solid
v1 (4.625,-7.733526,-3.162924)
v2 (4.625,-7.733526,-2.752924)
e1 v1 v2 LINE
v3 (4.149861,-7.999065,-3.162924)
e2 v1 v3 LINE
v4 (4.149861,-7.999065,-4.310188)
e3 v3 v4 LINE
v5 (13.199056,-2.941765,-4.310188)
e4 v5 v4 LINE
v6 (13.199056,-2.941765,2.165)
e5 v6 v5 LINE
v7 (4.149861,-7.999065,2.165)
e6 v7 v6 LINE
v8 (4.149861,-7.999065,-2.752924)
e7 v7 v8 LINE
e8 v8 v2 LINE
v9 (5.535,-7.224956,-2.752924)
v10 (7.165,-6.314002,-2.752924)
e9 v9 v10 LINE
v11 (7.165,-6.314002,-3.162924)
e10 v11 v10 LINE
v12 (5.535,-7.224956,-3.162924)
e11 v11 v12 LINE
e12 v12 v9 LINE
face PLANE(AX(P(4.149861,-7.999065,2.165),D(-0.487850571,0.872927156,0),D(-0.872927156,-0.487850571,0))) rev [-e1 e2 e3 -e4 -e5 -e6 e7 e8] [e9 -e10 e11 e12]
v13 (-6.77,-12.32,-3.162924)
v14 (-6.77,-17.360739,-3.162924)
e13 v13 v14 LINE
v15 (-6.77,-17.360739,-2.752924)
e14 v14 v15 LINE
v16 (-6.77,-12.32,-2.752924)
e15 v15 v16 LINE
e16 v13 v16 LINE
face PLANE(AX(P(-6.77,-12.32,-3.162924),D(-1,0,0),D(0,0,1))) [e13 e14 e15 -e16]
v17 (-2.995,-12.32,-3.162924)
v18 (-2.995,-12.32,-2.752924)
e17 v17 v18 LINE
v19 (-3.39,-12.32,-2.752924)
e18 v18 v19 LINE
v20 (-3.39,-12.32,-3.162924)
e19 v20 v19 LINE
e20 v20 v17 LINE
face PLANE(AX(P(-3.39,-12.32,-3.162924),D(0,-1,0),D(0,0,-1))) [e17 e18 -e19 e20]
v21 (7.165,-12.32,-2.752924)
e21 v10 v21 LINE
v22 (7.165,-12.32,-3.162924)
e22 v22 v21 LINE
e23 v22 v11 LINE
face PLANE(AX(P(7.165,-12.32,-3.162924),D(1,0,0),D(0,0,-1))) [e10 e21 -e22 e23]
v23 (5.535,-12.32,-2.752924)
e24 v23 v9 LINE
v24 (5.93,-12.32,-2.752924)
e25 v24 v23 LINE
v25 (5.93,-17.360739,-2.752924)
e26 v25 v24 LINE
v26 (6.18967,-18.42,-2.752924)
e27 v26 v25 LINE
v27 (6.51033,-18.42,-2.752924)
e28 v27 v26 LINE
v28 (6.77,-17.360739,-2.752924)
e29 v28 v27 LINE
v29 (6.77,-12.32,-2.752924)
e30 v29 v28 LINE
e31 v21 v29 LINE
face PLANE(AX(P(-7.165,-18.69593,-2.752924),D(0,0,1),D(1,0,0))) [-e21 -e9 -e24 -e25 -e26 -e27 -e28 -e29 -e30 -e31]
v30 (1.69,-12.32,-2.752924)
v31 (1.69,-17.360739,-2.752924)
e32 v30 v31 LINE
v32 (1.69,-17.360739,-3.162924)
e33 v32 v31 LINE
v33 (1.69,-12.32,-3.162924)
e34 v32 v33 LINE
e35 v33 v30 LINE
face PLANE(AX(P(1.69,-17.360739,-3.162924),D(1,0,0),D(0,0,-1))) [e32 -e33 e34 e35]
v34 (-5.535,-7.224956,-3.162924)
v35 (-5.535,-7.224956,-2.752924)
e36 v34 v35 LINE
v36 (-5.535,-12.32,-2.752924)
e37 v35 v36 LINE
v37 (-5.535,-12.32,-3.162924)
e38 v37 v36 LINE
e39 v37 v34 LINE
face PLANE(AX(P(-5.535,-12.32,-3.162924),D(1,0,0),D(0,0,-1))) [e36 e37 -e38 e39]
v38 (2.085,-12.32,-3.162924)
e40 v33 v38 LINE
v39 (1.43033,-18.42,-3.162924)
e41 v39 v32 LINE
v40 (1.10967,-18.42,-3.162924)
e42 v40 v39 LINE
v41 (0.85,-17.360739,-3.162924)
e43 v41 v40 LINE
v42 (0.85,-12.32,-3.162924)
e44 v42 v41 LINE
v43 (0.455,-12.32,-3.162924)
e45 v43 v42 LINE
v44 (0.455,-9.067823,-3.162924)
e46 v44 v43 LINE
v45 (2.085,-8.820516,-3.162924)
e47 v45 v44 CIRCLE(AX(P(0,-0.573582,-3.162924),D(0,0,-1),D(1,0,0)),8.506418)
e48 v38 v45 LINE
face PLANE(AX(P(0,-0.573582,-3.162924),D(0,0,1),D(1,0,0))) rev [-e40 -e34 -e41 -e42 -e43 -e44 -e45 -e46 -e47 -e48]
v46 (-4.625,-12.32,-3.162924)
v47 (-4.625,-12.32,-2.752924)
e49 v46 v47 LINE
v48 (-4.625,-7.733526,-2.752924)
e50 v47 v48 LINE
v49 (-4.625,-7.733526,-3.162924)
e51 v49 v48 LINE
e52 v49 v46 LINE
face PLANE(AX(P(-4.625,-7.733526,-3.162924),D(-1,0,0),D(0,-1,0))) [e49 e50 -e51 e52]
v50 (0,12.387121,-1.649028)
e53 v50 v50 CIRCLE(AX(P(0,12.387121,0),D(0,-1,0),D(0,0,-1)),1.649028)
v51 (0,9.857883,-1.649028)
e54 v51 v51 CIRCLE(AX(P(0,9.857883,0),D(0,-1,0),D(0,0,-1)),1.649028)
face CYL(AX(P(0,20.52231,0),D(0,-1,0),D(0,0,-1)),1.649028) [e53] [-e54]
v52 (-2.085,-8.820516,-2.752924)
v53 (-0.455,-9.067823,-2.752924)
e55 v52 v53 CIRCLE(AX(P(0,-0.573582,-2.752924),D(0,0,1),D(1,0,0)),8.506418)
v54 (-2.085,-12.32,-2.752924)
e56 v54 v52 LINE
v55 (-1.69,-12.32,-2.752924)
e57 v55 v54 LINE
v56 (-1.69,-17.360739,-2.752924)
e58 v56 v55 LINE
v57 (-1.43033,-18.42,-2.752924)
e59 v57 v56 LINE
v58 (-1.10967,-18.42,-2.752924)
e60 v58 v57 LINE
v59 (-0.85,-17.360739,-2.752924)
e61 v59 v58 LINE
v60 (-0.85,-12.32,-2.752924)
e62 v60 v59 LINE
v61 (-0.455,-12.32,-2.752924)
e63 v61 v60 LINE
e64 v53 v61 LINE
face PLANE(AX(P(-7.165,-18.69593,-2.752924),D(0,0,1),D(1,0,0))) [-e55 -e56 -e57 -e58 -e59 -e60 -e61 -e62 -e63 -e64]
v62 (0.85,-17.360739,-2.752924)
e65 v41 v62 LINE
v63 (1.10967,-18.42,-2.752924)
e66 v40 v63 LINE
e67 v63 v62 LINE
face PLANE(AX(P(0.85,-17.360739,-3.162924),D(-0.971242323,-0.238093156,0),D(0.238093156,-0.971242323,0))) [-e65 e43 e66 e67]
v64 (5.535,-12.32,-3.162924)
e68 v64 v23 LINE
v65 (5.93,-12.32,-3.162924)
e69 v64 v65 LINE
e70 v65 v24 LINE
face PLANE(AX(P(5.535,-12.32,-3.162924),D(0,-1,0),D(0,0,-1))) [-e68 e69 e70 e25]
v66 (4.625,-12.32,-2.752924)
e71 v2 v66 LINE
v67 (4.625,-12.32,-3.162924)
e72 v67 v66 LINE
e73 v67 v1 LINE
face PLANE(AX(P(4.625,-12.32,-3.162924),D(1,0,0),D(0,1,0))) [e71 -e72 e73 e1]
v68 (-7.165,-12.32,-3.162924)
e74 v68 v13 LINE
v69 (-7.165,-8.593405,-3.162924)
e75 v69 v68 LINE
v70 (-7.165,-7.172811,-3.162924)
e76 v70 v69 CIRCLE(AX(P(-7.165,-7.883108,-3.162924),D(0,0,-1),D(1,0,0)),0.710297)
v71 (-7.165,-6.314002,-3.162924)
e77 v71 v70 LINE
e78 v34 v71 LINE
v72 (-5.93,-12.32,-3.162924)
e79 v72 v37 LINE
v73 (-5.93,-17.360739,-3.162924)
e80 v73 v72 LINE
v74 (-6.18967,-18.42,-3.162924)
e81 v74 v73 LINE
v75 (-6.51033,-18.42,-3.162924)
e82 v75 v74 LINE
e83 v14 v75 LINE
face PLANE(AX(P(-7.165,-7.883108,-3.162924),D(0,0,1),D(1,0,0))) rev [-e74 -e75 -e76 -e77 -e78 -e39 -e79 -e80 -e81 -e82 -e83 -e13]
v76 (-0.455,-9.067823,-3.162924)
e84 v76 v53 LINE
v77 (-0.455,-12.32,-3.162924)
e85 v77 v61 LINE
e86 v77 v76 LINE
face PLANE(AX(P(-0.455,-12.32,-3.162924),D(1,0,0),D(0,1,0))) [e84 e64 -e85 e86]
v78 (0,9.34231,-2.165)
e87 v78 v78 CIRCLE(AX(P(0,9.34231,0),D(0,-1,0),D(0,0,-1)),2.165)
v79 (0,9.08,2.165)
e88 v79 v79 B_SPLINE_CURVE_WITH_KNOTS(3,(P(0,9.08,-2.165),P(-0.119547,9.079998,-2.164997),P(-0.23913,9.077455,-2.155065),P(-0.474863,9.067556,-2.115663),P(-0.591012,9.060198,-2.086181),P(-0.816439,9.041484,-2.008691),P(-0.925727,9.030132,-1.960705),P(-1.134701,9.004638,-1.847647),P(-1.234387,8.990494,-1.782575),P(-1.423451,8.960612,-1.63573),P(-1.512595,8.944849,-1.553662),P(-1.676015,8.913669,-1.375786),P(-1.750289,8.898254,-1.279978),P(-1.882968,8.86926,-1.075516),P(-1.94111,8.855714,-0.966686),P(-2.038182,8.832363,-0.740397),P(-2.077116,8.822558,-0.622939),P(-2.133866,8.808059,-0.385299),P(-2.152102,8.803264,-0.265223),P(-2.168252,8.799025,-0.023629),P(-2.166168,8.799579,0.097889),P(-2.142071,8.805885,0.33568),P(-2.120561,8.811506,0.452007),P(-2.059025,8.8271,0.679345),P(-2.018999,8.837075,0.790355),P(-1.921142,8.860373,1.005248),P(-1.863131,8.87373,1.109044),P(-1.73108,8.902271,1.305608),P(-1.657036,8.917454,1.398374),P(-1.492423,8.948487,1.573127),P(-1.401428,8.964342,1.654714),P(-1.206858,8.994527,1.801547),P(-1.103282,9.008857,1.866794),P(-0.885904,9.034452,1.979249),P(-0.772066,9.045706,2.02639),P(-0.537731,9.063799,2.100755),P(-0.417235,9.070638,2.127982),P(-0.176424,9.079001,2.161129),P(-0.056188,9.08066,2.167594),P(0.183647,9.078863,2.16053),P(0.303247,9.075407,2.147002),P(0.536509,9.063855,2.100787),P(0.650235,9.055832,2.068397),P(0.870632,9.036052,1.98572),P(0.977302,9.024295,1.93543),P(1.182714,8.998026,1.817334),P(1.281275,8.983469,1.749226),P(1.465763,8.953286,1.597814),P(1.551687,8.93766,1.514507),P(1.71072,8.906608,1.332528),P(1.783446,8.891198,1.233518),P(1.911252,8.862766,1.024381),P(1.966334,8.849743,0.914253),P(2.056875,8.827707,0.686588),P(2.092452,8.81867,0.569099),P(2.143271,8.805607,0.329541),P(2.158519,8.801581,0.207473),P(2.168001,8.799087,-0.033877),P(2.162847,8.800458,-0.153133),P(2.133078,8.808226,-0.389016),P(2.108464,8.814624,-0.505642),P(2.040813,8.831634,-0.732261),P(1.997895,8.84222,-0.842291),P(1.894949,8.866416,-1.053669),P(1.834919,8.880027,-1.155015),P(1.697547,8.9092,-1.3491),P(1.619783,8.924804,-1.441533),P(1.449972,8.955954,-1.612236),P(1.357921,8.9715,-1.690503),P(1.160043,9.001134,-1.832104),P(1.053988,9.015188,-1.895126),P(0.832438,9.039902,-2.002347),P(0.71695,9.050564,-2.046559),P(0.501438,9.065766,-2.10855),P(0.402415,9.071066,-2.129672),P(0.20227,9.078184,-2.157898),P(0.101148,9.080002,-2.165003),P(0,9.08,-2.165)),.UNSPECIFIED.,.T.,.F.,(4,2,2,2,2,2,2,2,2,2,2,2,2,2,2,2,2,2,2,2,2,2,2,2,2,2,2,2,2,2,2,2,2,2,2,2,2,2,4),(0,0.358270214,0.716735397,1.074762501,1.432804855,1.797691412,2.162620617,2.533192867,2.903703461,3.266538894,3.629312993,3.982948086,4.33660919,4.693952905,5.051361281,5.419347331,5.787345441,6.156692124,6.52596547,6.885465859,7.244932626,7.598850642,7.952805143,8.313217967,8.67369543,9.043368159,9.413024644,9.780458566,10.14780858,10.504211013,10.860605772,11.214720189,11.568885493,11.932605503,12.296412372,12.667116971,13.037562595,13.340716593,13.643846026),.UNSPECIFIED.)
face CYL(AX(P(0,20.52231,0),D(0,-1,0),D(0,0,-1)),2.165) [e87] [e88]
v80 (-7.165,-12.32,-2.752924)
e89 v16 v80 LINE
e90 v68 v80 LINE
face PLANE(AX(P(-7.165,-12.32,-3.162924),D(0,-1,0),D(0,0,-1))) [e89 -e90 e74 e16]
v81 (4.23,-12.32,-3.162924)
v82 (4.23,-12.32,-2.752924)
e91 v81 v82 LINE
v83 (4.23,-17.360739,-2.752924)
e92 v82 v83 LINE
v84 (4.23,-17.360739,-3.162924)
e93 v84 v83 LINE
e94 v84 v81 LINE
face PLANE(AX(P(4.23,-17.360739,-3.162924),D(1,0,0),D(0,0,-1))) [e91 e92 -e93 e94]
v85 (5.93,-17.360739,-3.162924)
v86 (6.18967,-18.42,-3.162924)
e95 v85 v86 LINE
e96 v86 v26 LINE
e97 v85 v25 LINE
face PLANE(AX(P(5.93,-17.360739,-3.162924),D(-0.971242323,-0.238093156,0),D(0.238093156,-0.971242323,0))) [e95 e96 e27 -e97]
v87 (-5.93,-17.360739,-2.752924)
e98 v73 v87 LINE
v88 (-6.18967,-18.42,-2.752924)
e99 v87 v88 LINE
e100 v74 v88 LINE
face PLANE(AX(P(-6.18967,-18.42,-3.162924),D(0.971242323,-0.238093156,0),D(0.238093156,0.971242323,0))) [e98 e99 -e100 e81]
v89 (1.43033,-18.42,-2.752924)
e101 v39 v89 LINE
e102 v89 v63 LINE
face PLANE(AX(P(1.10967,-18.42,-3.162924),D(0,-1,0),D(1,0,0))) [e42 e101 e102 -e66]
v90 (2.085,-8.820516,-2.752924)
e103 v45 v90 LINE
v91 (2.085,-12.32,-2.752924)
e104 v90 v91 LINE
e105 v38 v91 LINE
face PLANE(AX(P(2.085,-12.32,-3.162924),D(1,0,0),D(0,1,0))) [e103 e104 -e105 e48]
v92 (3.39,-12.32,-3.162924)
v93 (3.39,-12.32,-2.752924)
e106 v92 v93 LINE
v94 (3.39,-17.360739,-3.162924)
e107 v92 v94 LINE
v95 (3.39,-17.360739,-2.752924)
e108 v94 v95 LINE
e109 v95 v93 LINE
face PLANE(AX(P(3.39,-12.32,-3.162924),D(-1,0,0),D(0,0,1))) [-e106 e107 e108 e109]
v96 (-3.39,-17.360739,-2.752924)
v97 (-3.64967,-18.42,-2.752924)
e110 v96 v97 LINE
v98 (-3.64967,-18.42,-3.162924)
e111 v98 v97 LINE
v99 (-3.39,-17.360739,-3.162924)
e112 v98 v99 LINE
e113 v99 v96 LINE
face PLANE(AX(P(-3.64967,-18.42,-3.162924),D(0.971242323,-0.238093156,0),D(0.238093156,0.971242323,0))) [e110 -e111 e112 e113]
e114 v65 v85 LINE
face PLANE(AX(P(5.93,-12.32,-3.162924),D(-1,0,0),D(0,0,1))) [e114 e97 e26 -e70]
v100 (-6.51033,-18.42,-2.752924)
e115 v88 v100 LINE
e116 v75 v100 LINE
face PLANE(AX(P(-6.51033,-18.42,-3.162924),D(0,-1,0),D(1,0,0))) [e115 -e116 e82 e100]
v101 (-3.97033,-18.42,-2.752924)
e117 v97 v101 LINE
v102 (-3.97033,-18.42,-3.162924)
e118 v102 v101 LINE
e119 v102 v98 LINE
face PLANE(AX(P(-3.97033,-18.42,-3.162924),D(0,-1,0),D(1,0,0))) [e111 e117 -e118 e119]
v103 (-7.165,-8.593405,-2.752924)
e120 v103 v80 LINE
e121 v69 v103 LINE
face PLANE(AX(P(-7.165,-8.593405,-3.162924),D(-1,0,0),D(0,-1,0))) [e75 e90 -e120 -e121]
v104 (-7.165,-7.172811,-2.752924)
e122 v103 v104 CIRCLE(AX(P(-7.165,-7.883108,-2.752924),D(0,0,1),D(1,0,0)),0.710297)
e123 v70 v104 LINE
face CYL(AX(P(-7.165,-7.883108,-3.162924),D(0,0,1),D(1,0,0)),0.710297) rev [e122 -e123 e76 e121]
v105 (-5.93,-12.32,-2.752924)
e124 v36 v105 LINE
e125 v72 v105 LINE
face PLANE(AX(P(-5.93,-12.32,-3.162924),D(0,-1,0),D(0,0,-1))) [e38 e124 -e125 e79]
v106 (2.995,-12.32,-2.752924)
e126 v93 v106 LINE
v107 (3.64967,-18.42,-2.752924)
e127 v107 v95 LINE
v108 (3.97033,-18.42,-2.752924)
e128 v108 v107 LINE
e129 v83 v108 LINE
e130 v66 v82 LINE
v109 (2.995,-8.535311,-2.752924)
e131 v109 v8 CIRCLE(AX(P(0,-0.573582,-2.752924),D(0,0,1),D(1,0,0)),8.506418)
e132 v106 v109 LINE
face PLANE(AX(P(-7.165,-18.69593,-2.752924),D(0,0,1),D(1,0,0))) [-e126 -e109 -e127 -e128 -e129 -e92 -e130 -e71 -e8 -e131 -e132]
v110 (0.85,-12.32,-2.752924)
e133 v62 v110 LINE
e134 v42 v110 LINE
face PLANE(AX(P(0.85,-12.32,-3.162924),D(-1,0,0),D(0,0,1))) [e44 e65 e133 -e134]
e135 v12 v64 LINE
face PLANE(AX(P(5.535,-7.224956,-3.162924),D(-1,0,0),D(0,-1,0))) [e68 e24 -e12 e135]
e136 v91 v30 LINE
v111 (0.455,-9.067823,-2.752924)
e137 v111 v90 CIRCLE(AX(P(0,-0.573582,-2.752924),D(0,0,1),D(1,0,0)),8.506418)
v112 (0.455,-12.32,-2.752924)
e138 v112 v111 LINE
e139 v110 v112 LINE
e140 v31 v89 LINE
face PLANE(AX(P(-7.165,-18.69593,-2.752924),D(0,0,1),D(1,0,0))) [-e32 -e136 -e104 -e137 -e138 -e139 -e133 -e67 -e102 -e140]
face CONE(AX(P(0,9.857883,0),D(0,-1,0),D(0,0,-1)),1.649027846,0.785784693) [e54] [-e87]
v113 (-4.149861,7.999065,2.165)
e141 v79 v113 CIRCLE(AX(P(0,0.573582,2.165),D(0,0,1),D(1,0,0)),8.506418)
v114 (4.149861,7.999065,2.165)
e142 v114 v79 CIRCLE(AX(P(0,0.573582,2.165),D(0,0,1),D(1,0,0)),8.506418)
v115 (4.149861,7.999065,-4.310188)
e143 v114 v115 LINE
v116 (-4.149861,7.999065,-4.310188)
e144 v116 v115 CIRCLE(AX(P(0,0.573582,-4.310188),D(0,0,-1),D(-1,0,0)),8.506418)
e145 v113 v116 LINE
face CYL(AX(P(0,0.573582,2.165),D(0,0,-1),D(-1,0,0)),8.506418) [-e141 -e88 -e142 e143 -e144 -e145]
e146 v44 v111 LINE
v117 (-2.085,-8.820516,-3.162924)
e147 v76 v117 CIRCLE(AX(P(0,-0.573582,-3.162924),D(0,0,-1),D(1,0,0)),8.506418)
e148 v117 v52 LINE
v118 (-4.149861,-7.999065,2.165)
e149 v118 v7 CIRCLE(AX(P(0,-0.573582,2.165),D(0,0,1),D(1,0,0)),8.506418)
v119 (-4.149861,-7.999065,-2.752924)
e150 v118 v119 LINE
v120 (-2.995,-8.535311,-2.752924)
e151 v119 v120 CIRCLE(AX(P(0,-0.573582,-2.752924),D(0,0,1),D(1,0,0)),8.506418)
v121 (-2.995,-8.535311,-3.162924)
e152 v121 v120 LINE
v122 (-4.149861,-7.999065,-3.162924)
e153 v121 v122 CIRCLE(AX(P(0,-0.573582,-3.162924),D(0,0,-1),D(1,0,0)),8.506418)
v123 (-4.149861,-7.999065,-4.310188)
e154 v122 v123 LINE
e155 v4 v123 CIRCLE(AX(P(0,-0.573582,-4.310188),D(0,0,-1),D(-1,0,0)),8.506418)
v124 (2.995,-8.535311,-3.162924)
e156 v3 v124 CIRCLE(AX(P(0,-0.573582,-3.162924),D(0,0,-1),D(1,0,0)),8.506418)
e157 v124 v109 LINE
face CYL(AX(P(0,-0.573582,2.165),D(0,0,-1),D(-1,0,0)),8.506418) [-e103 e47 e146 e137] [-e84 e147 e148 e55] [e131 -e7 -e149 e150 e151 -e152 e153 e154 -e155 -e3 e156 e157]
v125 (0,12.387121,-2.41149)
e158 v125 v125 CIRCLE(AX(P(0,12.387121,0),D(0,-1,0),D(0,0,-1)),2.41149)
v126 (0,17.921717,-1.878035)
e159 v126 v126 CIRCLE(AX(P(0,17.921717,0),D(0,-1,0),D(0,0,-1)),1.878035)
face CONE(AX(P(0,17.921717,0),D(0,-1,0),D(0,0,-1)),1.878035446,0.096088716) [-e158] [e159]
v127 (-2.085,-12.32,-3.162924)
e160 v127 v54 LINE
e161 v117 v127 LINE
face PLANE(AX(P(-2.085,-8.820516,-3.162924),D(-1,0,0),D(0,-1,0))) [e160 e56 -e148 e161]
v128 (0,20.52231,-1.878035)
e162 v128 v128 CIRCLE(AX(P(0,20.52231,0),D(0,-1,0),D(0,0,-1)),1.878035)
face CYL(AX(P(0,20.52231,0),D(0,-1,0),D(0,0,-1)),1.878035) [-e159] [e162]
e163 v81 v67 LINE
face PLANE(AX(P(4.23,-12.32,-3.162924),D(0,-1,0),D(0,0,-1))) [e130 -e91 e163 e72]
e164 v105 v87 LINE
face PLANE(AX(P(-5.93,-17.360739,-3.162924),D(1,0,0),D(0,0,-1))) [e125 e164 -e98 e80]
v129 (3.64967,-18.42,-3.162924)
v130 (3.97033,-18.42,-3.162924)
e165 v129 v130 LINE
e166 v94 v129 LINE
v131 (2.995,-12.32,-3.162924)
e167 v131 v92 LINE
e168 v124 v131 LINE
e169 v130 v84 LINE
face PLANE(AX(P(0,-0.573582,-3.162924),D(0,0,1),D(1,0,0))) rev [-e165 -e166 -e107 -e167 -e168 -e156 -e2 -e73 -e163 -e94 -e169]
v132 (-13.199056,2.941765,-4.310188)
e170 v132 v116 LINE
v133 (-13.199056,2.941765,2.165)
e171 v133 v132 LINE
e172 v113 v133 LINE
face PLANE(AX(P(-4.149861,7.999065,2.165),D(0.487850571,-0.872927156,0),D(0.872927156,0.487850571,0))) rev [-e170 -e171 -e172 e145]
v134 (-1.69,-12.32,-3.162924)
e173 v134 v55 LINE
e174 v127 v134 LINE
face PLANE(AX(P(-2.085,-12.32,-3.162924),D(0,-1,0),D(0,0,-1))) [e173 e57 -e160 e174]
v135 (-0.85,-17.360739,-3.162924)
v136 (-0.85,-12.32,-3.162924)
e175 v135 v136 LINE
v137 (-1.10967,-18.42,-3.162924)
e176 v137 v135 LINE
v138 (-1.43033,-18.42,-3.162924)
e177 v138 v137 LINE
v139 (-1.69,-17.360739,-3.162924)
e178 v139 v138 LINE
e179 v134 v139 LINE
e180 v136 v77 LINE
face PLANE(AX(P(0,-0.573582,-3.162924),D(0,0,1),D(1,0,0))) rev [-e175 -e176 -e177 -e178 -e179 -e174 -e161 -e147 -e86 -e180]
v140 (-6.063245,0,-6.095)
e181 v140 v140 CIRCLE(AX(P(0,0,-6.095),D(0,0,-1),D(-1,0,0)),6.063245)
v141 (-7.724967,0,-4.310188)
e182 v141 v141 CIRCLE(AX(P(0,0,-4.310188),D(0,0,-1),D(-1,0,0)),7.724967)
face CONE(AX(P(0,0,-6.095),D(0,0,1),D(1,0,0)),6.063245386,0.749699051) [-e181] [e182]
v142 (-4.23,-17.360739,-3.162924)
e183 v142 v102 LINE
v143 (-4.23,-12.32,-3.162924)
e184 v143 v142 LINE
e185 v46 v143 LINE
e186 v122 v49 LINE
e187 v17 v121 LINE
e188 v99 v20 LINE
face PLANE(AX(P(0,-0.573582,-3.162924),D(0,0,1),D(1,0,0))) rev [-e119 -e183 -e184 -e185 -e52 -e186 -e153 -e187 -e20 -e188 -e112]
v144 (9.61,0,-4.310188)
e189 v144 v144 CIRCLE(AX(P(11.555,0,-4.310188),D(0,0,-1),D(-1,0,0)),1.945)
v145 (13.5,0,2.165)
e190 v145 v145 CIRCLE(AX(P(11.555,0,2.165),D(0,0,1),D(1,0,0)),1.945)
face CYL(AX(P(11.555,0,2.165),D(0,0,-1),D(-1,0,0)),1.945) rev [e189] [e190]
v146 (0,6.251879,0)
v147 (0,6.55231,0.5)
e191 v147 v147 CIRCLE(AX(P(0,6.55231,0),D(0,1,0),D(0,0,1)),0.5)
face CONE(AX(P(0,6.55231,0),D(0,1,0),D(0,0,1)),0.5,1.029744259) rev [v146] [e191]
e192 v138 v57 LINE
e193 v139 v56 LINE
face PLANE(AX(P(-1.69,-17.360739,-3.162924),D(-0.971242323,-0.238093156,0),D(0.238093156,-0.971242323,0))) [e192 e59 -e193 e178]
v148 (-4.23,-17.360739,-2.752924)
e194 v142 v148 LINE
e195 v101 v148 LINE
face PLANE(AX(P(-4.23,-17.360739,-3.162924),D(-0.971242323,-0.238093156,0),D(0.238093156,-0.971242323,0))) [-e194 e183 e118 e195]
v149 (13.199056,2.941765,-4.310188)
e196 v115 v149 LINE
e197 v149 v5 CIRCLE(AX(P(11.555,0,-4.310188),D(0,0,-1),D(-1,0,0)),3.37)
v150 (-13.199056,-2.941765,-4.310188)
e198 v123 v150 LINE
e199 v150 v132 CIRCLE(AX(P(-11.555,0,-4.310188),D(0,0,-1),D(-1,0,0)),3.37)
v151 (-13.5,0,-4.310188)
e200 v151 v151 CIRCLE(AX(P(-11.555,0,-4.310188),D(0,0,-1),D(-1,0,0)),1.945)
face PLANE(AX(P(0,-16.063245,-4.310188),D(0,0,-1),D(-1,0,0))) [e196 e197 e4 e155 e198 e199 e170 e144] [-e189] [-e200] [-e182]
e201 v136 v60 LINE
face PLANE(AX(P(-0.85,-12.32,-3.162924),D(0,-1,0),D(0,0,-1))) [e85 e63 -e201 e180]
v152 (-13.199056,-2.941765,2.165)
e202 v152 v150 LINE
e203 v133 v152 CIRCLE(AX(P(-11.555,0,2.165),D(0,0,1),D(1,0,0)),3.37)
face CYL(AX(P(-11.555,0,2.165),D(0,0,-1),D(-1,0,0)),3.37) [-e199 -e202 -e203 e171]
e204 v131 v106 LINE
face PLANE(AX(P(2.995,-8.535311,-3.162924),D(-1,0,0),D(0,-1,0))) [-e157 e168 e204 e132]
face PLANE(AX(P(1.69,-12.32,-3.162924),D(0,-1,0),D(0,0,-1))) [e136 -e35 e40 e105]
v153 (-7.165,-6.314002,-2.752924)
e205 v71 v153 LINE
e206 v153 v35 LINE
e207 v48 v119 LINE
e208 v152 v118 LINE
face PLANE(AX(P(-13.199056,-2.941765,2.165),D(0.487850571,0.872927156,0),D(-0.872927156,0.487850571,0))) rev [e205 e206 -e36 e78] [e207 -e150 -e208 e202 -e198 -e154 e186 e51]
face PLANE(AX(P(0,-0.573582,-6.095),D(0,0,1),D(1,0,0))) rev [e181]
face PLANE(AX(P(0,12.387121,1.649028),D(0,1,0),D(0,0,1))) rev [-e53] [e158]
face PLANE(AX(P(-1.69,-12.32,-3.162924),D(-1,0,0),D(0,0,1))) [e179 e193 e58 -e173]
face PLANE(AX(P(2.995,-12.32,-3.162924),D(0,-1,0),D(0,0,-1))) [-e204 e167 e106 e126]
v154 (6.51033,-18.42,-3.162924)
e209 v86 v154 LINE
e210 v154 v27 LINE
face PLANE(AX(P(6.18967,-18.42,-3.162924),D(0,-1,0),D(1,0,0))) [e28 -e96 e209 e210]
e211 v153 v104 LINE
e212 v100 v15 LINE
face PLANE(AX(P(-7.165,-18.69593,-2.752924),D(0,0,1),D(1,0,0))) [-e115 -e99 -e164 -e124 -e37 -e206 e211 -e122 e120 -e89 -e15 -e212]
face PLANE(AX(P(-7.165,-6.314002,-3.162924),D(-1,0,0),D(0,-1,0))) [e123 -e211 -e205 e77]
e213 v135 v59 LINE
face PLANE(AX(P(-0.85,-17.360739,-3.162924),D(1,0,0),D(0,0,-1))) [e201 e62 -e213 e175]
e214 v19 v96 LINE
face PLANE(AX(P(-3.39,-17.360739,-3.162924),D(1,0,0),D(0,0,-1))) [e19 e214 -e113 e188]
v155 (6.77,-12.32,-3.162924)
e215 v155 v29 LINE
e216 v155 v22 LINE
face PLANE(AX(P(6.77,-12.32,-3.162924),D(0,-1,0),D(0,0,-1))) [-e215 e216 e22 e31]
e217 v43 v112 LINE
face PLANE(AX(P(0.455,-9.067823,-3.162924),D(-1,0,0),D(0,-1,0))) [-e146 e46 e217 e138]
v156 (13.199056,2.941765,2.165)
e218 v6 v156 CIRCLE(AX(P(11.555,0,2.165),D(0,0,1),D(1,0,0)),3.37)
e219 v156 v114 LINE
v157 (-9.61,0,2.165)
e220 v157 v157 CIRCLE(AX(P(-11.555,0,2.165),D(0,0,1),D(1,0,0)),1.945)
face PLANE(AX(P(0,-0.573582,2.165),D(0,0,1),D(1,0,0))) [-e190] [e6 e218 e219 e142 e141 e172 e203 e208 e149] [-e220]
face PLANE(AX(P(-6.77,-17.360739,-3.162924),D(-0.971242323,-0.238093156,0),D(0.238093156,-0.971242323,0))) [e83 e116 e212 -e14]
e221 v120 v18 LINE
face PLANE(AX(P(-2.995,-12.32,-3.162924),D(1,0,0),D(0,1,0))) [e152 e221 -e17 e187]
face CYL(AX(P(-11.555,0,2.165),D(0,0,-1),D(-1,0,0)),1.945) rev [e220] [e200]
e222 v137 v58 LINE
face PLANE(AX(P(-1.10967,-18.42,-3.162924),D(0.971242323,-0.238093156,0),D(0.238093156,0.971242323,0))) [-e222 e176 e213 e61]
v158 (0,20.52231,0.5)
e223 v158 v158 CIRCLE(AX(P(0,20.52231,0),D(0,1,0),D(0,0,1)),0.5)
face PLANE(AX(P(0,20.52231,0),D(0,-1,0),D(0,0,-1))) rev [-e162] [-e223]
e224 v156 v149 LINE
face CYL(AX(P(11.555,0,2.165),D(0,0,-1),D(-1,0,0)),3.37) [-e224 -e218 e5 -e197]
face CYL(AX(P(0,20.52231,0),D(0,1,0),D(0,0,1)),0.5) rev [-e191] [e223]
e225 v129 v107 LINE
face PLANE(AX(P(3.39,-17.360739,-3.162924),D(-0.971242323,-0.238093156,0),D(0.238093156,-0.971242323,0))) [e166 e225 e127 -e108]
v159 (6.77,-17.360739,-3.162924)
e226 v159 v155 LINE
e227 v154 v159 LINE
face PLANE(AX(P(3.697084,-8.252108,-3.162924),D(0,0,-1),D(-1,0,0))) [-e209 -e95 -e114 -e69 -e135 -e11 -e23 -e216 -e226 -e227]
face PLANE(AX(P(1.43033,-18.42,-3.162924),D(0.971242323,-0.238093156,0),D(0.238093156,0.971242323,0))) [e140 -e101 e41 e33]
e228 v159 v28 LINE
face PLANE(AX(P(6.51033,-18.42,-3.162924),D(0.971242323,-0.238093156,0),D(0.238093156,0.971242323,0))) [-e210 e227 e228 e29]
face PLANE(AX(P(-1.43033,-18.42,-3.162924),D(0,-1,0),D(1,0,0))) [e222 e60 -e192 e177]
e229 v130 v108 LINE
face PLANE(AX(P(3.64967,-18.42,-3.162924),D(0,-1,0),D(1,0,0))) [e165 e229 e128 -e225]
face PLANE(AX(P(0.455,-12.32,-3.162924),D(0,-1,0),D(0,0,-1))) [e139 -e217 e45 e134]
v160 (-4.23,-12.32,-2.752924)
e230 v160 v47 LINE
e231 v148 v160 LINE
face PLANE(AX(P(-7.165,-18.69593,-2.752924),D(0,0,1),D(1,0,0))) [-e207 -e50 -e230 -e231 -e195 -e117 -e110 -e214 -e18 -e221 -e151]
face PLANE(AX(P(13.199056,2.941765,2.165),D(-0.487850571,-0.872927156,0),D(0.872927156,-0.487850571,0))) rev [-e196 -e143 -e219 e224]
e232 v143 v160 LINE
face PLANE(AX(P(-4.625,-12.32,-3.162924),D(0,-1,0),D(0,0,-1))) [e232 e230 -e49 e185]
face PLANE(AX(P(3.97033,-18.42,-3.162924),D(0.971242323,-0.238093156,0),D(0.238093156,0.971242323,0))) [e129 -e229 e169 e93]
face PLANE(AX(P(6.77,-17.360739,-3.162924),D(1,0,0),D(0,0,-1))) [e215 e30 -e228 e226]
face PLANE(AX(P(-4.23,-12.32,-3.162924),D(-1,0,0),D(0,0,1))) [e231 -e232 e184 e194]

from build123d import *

# Parameters (mm, degrees)
EXTRUDE6_DEPTH               = 3.162924
EXTRUDE6_2_DEPTH             = 3.162924
EXTRUDE6_3_DEPTH             = 3.162924
EXTRUDE6_4_DEPTH             = 3.162924
EXTRUDE6_5_DEPTH             = 3.162924
EXTRUDE6_6_DEPTH             = 3.162924
EXTRUDE7_START               = -2.752923646
EXTRUDE7_DEPTH               = 2.752923646
EXTRUDE1_DEPTH               = 2.165
EXTRUDE1_DEPTH_BACK          = 6.095
SKETCH3_R                    = 1.945
F_1_0_1_DIAMETER_HOLE1_D     = 1
F_1_0_1_DIAMETER_HOLE1_DEPTH = 13.97
F_1_0_1_DIAMETER_HOLE1_TIP   = 0.30043031


# Read off the part's stored shape, not the designer's step: Extrude7
with BuildPart() as part:
    # Sketch7 → Extrude6 (new body)
    with BuildSketch(Plane.XY):
        with BuildLine():
            Line((-5.535, -12.32), (-5.535, -7.224956165))
            Line((-5.535, -7.224956165), (-7.165, -6.314002227))
            Line((-7.165, -6.314002227), (-7.165, -7.17281133))
            ThreePointArc((-7.165, -7.17281133), (-6.454703172, -7.883108158), (-7.165, -8.593404986))
            Line((-7.165, -8.593404986), (-7.165, -12.32))
            Line((-7.165, -12.32), (-6.77, -12.32))
            Line((-6.77, -12.32), (-6.77, -17.360738904))
            Line((-6.77, -17.360738904), (-6.510329667, -18.42))
            Line((-6.510329667, -18.42), (-6.189670333, -18.42))
            Line((-6.189670333, -18.42), (-5.93, -17.360738904))
            Line((-5.93, -17.360738904), (-5.93, -12.32))
            Line((-5.93, -12.32), (-5.535, -12.32))
        make_face()
    extrude(amount=-EXTRUDE6_DEPTH)


with BuildPart() as body_2:
    # Sketch7 → Extrude6 2 (new body)
    with BuildSketch(Plane.XY):
        with BuildLine():
            Line((-4.625, -7.733525542), (-4.625, -12.32))
            Line((-4.625, -12.32), (-4.23, -12.32))
            Line((-4.23, -12.32), (-4.23, -17.360738904))
            Line((-4.23, -17.360738904), (-3.970329667, -18.42))
            Line((-3.970329667, -18.42), (-3.649670333, -18.42))
            Line((-3.649670333, -18.42), (-3.39, -17.360738904))
            Line((-3.39, -17.360738904), (-3.39, -12.32))
            Line((-3.39, -12.32), (-2.995, -12.32))
            Line((-2.995, -12.32), (-2.995, -8.535310619))
            ThreePointArc((-2.995, -8.535310619), (-3.582478148, -8.288826526), (-4.149861063, -7.999065227))
            Line((-4.149861063, -7.999065227), (-4.625, -7.733525542))
        make_face()
    extrude(amount=-EXTRUDE6_2_DEPTH)


with BuildPart() as body_3:
    # Sketch7 → Extrude6 3 (new body)
    with BuildSketch(Plane.XY):
        with BuildLine():
            Line((-0.455, -12.32), (-0.455, -9.067822531))
            ThreePointArc((-0.455, -9.067822531), (-1.276005531, -8.983751864), (-2.085, -8.82051612))
            Line((-2.085, -8.82051612), (-2.085, -12.32))
            Line((-2.085, -12.32), (-1.69, -12.32))
            Line((-1.69, -12.32), (-1.69, -17.360738904))
            Line((-1.69, -17.360738904), (-1.430329667, -18.42))
            Line((-1.430329667, -18.42), (-1.109670333, -18.42))
            Line((-1.109670333, -18.42), (-0.85, -17.360738904))
            Line((-0.85, -17.360738904), (-0.85, -12.32))
            Line((-0.85, -12.32), (-0.455, -12.32))
        make_face()
    extrude(amount=-EXTRUDE6_3_DEPTH)


with BuildPart() as body_4:
    # Sketch7 → Extrude6 4 (new body)
    with BuildSketch(Plane.XY):
        with BuildLine():
            Line((4.625, -12.32), (4.625, -7.733525542))
            Line((4.625, -7.733525542), (4.149861063, -7.999065227))
            ThreePointArc((4.149861063, -7.999065227), (3.582478148, -8.288826526), (2.995, -8.535310619))
            Line((2.995, -8.535310619), (2.995, -12.32))
            Line((2.995, -12.32), (3.39, -12.32))
            Line((3.39, -12.32), (3.39, -17.360738904))
            Line((3.39, -17.360738904), (3.649670333, -18.42))
            Line((3.649670333, -18.42), (3.970329667, -18.42))
            Line((3.970329667, -18.42), (4.23, -17.360738904))
            Line((4.23, -17.360738904), (4.23, -12.32))
            Line((4.23, -12.32), (4.625, -12.32))
        make_face()
    extrude(amount=-EXTRUDE6_4_DEPTH)


with BuildPart() as body_5:
    # Sketch7 → Extrude6 5 (new body)
    with BuildSketch(Plane.XY):
        with BuildLine():
            Line((0.455, -9.067822531), (0.455, -12.32))
            Line((0.455, -12.32), (0.85, -12.32))
            Line((0.85, -12.32), (0.85, -17.360738904))
            Line((0.85, -17.360738904), (1.109670333, -18.42))
            Line((1.109670333, -18.42), (1.430329667, -18.42))
            Line((1.430329667, -18.42), (1.69, -17.360738904))
            Line((1.69, -17.360738904), (1.69, -12.32))
            Line((1.69, -12.32), (2.085, -12.32))
            Line((2.085, -12.32), (2.085, -8.82051612))
            ThreePointArc((2.085, -8.82051612), (1.276005531, -8.983751864), (0.455, -9.067822531))
        make_face()
    extrude(amount=-EXTRUDE6_5_DEPTH)


with BuildPart() as body_6:
    # Sketch7 → Extrude6 6 (new body)
    with BuildSketch(Plane.XY):
        Polygon((5.535, -7.224956165), (5.535, -12.32), (5.93, -12.32), (5.93, -17.360738904), (6.189670333, -18.42), (6.510329667, -18.42), (6.77, -17.360738904), (6.77, -12.32), (7.165, -12.32), (7.165, -6.314002227), align=None)
    extrude(amount=-EXTRUDE6_6_DEPTH)


with BuildPart() as extrude7_tool:
    # Extrude7 outline → Extrude7 (new body)
    with BuildSketch(Plane.XY.offset(EXTRUDE7_START)):
        with BuildLine():
            Line((-5.93, -17.360738904), (-5.93, -12.32))
            Line((-5.93, -12.32), (-5.535, -12.32))
            Line((-5.535, -12.32), (-5.535, -7.224956165))
            Line((-5.535, -7.224956165), (-7.165, -6.314002227))
            Line((-7.165, -6.314002227), (-7.165, -7.17281133))
            ThreePointArc((-7.165, -7.17281133), (-6.454703172, -7.883108158), (-7.165, -8.593404986))
            Line((-7.165, -8.593404986), (-7.165, -12.32))
            Line((-7.165, -12.32), (-6.77, -12.32))
            Line((-6.77, -12.32), (-6.77, -17.360738904))
            Line((-6.77, -17.360738904), (-6.510329667, -18.42))
            Line((-6.510329667, -18.42), (-6.189670333, -18.42))
            Line((-6.189670333, -18.42), (-5.93, -17.360738904))
        make_face()
        Polygon((6.77, -17.360738904), (6.77, -12.32), (7.165, -12.32), (7.165, -6.314002227), (5.535, -7.224956165), (5.535, -12.32), (5.93, -12.32), (5.93, -17.360738904), (6.189670333, -18.42), (6.510329667, -18.42), align=None)
        with BuildLine():
            Line((4.23, -17.360738904), (4.23, -12.32))
            Line((4.23, -12.32), (4.625, -12.32))
            Line((4.625, -12.32), (4.625, -7.733525542))
            Line((4.625, -7.733525542), (4.149861063, -7.999065227))
            ThreePointArc((4.149861063, -7.999065227), (3.582478148, -8.288826526), (2.995, -8.535310619))
            Line((2.995, -8.535310619), (2.995, -12.32))
            Line((2.995, -12.32), (3.39, -12.32))
            Line((3.39, -12.32), (3.39, -17.360738904))
            Line((3.39, -17.360738904), (3.649670333, -18.42))
            Line((3.649670333, -18.42), (3.970329667, -18.42))
            Line((3.970329667, -18.42), (4.23, -17.360738904))
        make_face()
        with BuildLine():
            Line((1.69, -17.360738904), (1.69, -12.32))
            Line((1.69, -12.32), (2.085, -12.32))
            Line((2.085, -12.32), (2.085, -8.82051612))
            ThreePointArc((2.085, -8.82051612), (1.276005531, -8.983751864), (0.455, -9.067822531))
            Line((0.455, -9.067822531), (0.455, -12.32))
            Line((0.455, -12.32), (0.85, -12.32))
            Line((0.85, -12.32), (0.85, -17.360738904))
            Line((0.85, -17.360738904), (1.109670333, -18.42))
            Line((1.109670333, -18.42), (1.430329667, -18.42))
            Line((1.430329667, -18.42), (1.69, -17.360738904))
        make_face()
        with BuildLine():
            Line((-0.85, -17.360738904), (-0.85, -12.32))
            Line((-0.85, -12.32), (-0.455, -12.32))
            Line((-0.455, -12.32), (-0.455, -9.067822531))
            ThreePointArc((-0.455, -9.067822531), (-1.276005531, -8.983751864), (-2.085, -8.82051612))
            Line((-2.085, -8.82051612), (-2.085, -12.32))
            Line((-2.085, -12.32), (-1.69, -12.32))
            Line((-1.69, -12.32), (-1.69, -17.360738904))
            Line((-1.69, -17.360738904), (-1.430329667, -18.42))
            Line((-1.430329667, -18.42), (-1.109670333, -18.42))
            Line((-1.109670333, -18.42), (-0.85, -17.360738904))
        make_face()
        with BuildLine():
            Line((-3.39, -17.360738904), (-3.39, -12.32))
            Line((-3.39, -12.32), (-2.995, -12.32))
            Line((-2.995, -12.32), (-2.995, -8.535310619))
            ThreePointArc((-2.995, -8.535310619), (-3.582478148, -8.288826526), (-4.149861063, -7.999065227))
            Line((-4.149861063, -7.999065227), (-4.625, -7.733525542))
            Line((-4.625, -7.733525542), (-4.625, -12.32))
            Line((-4.625, -12.32), (-4.23, -12.32))
            Line((-4.23, -12.32), (-4.23, -17.360738904))
            Line((-4.23, -17.360738904), (-3.970329667, -18.42))
            Line((-3.970329667, -18.42), (-3.649670333, -18.42))
            Line((-3.649670333, -18.42), (-3.39, -17.360738904))
        make_face()
    extrude(amount=EXTRUDE7_DEPTH)


with BuildPart() as part_1:
    add(part.part)

    # Extrude7: cut by extrude7_tool
    add(extrude7_tool.part, mode=Mode.SUBTRACT)



with BuildPart() as body_2_1:
    add(body_2.part)

    # Extrude7: cut by extrude7_tool
    add(extrude7_tool.part, mode=Mode.SUBTRACT)


with BuildPart() as body_3_1:
    add(body_3.part)

    # Extrude7: cut by extrude7_tool
    add(extrude7_tool.part, mode=Mode.SUBTRACT)


with BuildPart() as body_4_1:
    add(body_4.part)

    # Extrude7: cut by extrude7_tool
    add(extrude7_tool.part, mode=Mode.SUBTRACT)


with BuildPart() as body_5_1:
    add(body_5.part)

    # Extrude7: cut by extrude7_tool
    add(extrude7_tool.part, mode=Mode.SUBTRACT)


with BuildPart() as body_6_1:
    add(body_6.part)

    # Extrude7: cut by extrude7_tool
    add(extrude7_tool.part, mode=Mode.SUBTRACT)


with BuildPart() as part_2:
    add(part_1.part)

    add(body_2_1.part)  # Extrude1 merges body 2

    add(body_3_1.part)  # Extrude1 merges body 3

    add(body_4_1.part)  # Extrude1 merges body 4

    add(body_5_1.part)  # Extrude1 merges body 5

    add(body_6_1.part)  # Extrude1 merges body 6
    # Sketch3 → Extrude1 (add, two sides: drawn at the far end of the back side and taken through both)
    with BuildSketch(Plane.XY.offset(-EXTRUDE1_DEPTH_BACK)):
        with BuildLine():
            Line((4.149861063, -7.999065227), (13.199056425, -2.941764516))
            ThreePointArc((13.199056425, -2.941764516), (14.925, 0), (13.199056425, 2.941764516))
            Line((13.199056425, 2.941764516), (4.149861063, 7.999065227))
            ThreePointArc((4.149861063, 7.999065227), (0, 9.08), (-4.149861063, 7.999065227))
            Line((-4.149861063, 7.999065227), (-13.199056425, 2.941764516))
            ThreePointArc((-13.199056425, 2.941764516), (-14.925, 0), (-13.199056425, -2.941764516))
            Line((-13.199056425, -2.941764516), (-4.149861063, -7.999065227))
            ThreePointArc((-4.149861063, -7.999065227), (0, -9.08), (4.149861063, -7.999065227))
        make_face()
        with Locations((11.555, 0)):
            Circle(SKETCH3_R, mode=Mode.SUBTRACT)
        with Locations((-11.555, 0)):
            Circle(SKETCH3_R, mode=Mode.SUBTRACT)
    extrude(amount=EXTRUDE1_DEPTH + EXTRUDE1_DEPTH_BACK)

    # Sketch5 → Cut-Revolve1 (revolve, cut)
    with BuildSketch(Plane(origin=(0, 0, 0), x_dir=(0, 0, -1), z_dir=(1, 0, 0)), mode=Mode.PRIVATE) as cut_revolve1_sk:
        Polygon((4.310187736, -16.063245386), (4.310187736, -7.724967149), (6.095, -6.063245386), (6.095, -16.063245386), align=None)
    revolve(cut_revolve1_sk.sketch.rotate(Axis((0, 0, 0), (0, 0, 1)), 270), axis=Axis((0, 0, 0), (0, 0, 1)), mode=Mode.SUBTRACT)

    # Sketch8 → Revolve1 (revolve)
    with BuildSketch(Plane(origin=(0, 0, 0), x_dir=(0, 0, -1), z_dir=(1, 0, 0)), mode=Mode.PRIVATE) as revolve1_sk:
        Polygon((0, 0), (0, 20.522309629), (-1.878035446, 20.522309629), (-1.878035446, 17.921716672), (-2.411490412, 12.387121404), (-1.649027846, 12.387121404), (-1.649027846, 9.857883061), (-2.165, 9.342309629), (-2.165, 0), align=None)
    revolve(revolve1_sk.sketch.rotate(Axis((0, 20.522309629, 0), (0, 1, 0)), 180), axis=Axis((0, 20.522309629, 0), (0, 1, 0)))

    # Ø1.0 (1) Diameter Hole1
    with Locations(Plane.ZX.offset(20.522309629)):
        with Locations((0, 0)):
            Hole(F_1_0_1_DIAMETER_HOLE1_D / 2, depth=F_1_0_1_DIAMETER_HOLE1_DEPTH)
            with Locations((0, 0, -(F_1_0_1_DIAMETER_HOLE1_DEPTH + F_1_0_1_DIAMETER_HOLE1_TIP / 2))):  # 118° drill point
                Cone(0, F_1_0_1_DIAMETER_HOLE1_D / 2, F_1_0_1_DIAMETER_HOLE1_TIP, mode=Mode.SUBTRACT)


solid = part_2.part
